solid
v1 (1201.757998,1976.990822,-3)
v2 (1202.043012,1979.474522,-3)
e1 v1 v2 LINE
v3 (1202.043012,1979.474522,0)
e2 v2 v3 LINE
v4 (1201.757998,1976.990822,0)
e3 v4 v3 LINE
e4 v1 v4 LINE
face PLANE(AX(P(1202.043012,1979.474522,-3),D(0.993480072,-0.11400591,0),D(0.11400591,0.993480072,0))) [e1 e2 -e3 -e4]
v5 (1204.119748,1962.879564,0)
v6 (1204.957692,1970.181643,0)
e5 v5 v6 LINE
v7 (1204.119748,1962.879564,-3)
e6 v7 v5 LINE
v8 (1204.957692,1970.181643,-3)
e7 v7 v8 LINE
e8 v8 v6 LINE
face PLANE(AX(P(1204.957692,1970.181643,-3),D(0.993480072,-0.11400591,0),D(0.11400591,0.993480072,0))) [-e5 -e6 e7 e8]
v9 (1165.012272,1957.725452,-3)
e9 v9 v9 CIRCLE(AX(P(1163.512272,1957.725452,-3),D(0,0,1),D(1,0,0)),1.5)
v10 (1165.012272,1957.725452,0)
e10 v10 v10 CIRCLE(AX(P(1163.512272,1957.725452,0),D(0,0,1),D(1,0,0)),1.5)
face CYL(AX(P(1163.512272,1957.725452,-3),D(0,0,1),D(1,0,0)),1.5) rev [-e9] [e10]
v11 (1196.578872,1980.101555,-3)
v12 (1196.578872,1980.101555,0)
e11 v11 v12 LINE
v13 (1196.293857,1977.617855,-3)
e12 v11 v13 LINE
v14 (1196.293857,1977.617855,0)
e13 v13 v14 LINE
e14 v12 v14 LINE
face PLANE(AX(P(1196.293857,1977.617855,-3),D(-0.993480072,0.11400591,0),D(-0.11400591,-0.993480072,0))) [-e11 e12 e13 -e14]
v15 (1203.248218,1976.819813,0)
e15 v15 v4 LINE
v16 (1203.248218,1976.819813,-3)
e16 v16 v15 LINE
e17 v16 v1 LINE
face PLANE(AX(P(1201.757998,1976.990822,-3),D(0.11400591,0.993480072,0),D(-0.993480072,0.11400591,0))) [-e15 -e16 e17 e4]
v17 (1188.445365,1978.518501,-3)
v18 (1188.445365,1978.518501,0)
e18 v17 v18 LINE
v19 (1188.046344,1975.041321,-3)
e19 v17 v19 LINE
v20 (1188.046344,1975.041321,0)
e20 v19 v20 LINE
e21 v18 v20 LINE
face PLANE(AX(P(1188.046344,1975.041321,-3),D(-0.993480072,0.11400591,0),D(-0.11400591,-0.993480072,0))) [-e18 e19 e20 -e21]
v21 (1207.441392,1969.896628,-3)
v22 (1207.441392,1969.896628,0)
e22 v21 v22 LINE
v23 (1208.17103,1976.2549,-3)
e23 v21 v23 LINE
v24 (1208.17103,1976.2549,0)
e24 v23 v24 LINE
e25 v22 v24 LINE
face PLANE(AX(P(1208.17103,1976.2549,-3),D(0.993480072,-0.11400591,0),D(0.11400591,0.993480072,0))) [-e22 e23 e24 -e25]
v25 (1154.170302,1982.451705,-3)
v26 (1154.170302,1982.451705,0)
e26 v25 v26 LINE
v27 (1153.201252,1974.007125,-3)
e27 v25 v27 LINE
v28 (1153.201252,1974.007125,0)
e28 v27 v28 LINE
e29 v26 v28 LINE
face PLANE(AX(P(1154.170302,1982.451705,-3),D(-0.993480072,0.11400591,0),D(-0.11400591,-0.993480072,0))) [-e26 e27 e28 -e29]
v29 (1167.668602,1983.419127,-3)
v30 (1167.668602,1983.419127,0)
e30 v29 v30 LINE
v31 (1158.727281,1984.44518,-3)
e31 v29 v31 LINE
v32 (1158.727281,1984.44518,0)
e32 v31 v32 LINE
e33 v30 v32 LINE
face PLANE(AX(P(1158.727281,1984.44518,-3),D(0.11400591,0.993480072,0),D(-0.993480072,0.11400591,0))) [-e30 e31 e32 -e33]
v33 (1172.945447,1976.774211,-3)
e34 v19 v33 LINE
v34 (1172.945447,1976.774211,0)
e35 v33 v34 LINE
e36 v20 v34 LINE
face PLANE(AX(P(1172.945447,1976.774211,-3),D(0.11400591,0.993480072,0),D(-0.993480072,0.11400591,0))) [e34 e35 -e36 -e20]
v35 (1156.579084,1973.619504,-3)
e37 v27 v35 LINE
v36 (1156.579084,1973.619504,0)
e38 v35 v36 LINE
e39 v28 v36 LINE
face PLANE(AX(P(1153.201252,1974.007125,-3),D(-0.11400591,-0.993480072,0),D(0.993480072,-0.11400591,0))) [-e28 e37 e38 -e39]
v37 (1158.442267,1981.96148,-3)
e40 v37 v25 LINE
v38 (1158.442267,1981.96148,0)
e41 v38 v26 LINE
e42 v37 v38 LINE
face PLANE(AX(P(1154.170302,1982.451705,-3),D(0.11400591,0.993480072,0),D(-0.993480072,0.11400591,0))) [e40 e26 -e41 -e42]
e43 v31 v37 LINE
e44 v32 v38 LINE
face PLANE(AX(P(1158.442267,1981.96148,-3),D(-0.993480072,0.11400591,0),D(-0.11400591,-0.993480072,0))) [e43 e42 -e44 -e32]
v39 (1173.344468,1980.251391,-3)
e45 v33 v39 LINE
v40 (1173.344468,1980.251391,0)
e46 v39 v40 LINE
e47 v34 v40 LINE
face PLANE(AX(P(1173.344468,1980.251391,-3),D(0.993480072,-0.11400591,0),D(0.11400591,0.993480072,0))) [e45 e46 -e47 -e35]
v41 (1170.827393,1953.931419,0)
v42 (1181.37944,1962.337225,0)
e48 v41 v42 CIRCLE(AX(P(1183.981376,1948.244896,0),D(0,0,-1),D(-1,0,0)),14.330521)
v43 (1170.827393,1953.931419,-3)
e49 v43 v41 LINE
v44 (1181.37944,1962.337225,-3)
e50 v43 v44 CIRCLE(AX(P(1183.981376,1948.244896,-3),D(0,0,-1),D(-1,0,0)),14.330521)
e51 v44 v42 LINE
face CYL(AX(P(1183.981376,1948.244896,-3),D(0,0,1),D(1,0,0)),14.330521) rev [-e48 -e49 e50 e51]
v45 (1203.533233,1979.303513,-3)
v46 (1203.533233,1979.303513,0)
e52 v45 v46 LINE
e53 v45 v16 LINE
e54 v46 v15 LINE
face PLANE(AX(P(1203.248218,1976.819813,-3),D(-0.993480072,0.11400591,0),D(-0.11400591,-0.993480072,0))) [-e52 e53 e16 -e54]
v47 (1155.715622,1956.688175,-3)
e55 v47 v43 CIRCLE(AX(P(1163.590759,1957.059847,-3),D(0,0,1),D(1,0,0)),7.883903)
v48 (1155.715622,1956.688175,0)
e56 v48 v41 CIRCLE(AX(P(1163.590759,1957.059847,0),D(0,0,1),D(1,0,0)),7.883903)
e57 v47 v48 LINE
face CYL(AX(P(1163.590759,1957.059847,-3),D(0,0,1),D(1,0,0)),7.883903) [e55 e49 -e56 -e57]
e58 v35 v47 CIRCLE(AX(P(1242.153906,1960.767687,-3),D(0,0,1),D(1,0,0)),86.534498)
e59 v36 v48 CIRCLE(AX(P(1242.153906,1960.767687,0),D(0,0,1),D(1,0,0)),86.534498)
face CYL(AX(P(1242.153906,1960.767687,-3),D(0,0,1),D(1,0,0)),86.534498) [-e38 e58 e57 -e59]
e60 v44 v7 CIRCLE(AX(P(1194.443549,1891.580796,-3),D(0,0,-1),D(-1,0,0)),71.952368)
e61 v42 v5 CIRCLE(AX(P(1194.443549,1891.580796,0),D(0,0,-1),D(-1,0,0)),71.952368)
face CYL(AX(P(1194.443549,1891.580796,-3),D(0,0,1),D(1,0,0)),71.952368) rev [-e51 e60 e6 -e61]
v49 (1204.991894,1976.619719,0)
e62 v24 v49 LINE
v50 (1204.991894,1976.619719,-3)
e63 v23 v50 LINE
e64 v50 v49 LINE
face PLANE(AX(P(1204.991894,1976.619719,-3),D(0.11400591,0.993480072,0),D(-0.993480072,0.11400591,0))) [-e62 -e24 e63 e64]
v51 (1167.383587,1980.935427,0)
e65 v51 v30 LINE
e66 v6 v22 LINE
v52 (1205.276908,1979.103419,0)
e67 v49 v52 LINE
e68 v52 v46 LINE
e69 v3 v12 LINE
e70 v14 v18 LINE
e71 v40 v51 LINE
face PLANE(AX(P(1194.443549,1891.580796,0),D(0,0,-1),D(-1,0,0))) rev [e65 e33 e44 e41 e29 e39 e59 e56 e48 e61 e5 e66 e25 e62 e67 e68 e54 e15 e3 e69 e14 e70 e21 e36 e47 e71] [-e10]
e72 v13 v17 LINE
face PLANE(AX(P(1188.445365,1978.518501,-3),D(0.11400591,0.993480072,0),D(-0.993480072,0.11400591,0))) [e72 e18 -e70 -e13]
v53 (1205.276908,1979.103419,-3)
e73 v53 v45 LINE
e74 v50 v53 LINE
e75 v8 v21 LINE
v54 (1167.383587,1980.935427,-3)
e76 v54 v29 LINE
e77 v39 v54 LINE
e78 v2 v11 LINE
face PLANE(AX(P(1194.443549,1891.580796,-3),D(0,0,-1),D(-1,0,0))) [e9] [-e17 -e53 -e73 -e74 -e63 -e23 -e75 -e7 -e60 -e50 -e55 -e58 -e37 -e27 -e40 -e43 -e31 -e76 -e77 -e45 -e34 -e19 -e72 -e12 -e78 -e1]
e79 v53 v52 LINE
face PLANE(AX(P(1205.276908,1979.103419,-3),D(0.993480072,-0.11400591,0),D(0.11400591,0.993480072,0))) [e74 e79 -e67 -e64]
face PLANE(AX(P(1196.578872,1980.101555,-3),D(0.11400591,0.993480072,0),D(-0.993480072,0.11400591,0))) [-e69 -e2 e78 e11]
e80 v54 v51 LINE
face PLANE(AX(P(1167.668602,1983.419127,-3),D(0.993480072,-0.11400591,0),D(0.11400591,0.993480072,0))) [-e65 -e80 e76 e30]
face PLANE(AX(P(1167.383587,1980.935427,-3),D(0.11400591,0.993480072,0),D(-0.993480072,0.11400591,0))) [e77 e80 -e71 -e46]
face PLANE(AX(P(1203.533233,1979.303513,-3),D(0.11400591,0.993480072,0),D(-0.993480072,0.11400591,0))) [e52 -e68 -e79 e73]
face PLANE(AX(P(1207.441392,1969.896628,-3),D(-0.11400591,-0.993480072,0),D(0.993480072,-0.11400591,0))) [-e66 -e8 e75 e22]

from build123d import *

# Parameters (mm, degrees)
ESQUISSE1_R               = 1.5
T_LE_DE_BASE_PLI_E1_DEPTH = 3


# Sheet-metal steps are written as plain solids
with BuildPart() as part:
    # Esquisse1 → Tôle de base pliée1 (new body)
    with BuildSketch(Plane.XY):
        with BuildLine():
            Line((1154.170302219, 1982.451705153), (1153.201251986, 1974.007124545))
            Line((1153.201251986, 1974.007124545), (1156.579084229, 1973.619504452))
            ThreePointArc((1156.579084229, 1973.619504452), (1155.731717841, 1965.1750361), (1155.715622171, 1956.688174697))
            ThreePointArc((1155.715622171, 1956.688174697), (1162.175892986, 1949.303940909), (1170.827393014, 1953.931419154))
            ThreePointArc((1170.827393014, 1953.931419154), (1175.052398427, 1959.453694764), (1181.379439759, 1962.337225003))
            ThreePointArc((1181.379439759, 1962.337225003), (1192.728026875, 1963.512709412), (1204.119748438, 1962.879564131))
            Line((1204.119748438, 1962.879564131), (1204.957691875, 1970.181642657))
            Line((1204.957691875, 1970.181642657), (1207.441392054, 1969.896627882))
            Line((1207.441392054, 1969.896627882), (1208.171029877, 1976.25490034))
            Line((1208.171029877, 1976.25490034), (1204.991893648, 1976.619719251))
            Line((1204.991893648, 1976.619719251), (1205.276908423, 1979.10341943))
            Line((1205.276908423, 1979.10341943), (1203.533232527, 1979.303513385))
            Line((1203.533232527, 1979.303513385), (1203.248217753, 1976.819813206))
            Line((1203.248217753, 1976.819813206), (1201.757997646, 1976.990822071))
            Line((1201.757997646, 1976.990822071), (1202.04301242, 1979.47452225))
            Line((1202.04301242, 1979.47452225), (1196.578872027, 1980.101554754))
            Line((1196.578872027, 1980.101554754), (1196.293857252, 1977.617854575))
            Line((1196.293857252, 1977.617854575), (1188.445364687, 1978.518501263))
            Line((1188.445364687, 1978.518501263), (1188.046344003, 1975.041321013))
            Line((1188.046344003, 1975.041321013), (1172.945446915, 1976.774210843))
            Line((1172.945446915, 1976.774210843), (1173.3444676, 1980.251391093))
            Line((1173.3444676, 1980.251391093), (1167.383587171, 1980.935426552))
            Line((1167.383587171, 1980.935426552), (1167.668601945, 1983.419126731))
            Line((1167.668601945, 1983.419126731), (1158.727281302, 1984.445179919))
            Line((1158.727281302, 1984.445179919), (1158.442266527, 1981.961479741))
            Line((1158.442266527, 1981.961479741), (1154.170302219, 1982.451705153))
        make_face()
        with Locations((1163.512272203, 1957.725451963)):
            Circle(ESQUISSE1_R, mode=Mode.SUBTRACT)
    extrude(amount=-T_LE_DE_BASE_PLI_E1_DEPTH)


solid = part.part
